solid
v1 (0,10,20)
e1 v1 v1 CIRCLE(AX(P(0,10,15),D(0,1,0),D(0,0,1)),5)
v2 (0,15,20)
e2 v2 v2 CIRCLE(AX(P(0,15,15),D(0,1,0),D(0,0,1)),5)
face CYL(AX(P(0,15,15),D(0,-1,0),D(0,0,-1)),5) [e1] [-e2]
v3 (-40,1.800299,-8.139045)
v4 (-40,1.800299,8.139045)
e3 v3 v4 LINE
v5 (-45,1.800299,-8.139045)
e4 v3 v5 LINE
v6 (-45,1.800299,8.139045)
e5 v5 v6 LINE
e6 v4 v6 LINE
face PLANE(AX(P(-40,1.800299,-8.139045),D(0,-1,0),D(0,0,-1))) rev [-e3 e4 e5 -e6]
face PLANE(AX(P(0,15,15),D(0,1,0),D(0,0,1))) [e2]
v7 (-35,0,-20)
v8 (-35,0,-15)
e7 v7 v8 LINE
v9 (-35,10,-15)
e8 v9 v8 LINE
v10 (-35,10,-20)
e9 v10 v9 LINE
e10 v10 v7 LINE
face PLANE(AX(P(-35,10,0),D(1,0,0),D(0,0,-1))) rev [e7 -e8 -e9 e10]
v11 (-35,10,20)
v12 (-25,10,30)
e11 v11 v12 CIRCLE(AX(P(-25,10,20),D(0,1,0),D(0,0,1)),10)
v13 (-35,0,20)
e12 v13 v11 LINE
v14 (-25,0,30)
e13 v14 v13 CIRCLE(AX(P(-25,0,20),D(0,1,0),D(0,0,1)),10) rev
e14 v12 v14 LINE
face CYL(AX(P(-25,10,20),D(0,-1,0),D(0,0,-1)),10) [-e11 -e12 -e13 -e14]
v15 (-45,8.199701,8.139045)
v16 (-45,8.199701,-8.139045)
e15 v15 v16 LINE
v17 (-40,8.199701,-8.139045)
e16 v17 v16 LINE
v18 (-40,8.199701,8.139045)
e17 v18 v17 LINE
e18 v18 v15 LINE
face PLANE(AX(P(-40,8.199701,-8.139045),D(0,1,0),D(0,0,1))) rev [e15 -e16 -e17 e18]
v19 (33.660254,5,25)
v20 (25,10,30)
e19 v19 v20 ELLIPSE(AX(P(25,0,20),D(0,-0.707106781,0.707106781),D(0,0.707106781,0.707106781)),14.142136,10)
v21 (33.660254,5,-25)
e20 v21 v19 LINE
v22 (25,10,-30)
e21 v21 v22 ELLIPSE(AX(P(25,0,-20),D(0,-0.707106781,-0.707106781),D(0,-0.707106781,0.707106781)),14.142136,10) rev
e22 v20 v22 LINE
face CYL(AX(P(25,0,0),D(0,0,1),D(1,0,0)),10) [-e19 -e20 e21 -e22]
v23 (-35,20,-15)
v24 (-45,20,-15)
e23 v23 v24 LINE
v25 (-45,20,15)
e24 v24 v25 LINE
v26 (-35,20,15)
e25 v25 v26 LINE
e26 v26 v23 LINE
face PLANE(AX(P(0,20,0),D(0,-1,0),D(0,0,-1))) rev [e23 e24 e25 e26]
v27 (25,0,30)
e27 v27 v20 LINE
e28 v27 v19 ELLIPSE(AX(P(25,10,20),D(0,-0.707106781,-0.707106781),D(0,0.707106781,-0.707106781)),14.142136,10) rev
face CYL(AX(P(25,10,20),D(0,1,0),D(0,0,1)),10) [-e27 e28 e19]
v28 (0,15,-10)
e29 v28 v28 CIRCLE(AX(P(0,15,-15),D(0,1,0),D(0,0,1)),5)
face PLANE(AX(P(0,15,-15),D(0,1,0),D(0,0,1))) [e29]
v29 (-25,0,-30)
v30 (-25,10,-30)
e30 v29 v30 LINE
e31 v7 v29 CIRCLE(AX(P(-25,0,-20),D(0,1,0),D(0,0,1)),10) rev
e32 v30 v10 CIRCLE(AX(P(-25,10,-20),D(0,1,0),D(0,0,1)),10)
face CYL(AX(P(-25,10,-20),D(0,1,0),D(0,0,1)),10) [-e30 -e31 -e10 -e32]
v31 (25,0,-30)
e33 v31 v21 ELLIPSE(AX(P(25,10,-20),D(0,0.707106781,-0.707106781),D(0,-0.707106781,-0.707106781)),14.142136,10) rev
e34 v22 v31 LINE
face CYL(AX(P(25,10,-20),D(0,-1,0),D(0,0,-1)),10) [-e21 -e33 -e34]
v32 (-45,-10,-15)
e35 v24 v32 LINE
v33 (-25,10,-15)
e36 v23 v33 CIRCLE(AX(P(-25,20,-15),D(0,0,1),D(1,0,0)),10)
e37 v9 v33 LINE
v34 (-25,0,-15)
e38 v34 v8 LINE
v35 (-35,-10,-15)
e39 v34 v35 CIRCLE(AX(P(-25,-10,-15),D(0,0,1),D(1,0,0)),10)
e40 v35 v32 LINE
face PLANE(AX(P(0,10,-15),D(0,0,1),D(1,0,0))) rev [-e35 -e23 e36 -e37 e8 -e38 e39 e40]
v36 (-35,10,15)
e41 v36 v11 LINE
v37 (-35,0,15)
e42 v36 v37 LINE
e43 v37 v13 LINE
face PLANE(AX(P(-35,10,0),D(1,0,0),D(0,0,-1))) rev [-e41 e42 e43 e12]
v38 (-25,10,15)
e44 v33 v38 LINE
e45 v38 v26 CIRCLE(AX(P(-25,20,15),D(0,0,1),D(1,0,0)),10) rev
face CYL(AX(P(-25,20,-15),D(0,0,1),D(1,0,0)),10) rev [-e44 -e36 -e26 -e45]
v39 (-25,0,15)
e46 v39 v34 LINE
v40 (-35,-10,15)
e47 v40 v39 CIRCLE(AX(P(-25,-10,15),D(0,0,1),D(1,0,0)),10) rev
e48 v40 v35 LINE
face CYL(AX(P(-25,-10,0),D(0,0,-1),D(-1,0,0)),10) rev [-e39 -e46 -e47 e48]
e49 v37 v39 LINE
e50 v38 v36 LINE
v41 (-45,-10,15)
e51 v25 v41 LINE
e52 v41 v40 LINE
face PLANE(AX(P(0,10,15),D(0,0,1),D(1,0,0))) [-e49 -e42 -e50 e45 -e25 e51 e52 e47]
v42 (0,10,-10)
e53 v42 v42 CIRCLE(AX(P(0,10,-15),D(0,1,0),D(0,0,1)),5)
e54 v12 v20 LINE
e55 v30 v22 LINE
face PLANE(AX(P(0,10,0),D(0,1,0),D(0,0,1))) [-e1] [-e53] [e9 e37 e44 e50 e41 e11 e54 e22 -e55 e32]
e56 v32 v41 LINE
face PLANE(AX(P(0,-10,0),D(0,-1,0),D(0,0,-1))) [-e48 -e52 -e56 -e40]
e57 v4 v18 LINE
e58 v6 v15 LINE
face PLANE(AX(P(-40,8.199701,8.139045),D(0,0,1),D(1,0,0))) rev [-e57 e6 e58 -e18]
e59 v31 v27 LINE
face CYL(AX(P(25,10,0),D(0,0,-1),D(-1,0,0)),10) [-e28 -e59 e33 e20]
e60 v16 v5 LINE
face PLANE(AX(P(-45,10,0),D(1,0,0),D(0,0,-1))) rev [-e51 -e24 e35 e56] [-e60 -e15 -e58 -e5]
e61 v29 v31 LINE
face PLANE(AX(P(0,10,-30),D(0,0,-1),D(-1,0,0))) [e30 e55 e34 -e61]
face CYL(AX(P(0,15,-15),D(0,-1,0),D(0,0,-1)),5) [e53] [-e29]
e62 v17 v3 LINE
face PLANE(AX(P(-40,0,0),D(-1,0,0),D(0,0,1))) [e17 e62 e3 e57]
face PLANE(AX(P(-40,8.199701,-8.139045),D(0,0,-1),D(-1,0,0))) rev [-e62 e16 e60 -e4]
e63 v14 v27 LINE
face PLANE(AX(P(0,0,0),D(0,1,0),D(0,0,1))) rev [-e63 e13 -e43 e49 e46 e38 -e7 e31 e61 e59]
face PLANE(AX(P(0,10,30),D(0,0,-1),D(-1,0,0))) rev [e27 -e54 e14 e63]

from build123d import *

# Parameters (mm, degrees)
SKETCH1_W                = 10
SKETCH1_H                = 30
SKETCH1_W_2              = 70
SKETCH1_H_2              = 60
BOSS_EXTRUDE1_DEPTH      = 10
BOSS_EXTRUDE2_DEPTH      = 10
BOSS_EXTRUDE2_DEPTH_BACK = 20
SKETCH2_W                = 10
SKETCH2_H                = 30
FILLET1_R                = 10
SKETCH3_R                = 5
BOSS_EXTRUDE3_DEPTH      = 5
SKETCH4_W                = 16.278089822
SKETCH4_H                = 6.399401724
CUT_EXTRUDE1_DEPTH       = 5


with BuildPart() as part:
    # Sketch1 → Boss-Extrude1 (new body)
    with BuildSketch(Plane(origin=(0, 0, 0), x_dir=(1, 0, 0), z_dir=(0, 1, 0))):
        with Locations((-40, 0)):
            Rectangle(SKETCH1_W, SKETCH1_H)
        Rectangle(SKETCH1_W_2, SKETCH1_H_2)
    extrude(amount=BOSS_EXTRUDE1_DEPTH)

    # Sketch2 → Boss-Extrude2 (add, two sides: drawn at the far end of the back side and taken through both)
    with BuildSketch(Plane(origin=(0, 10, 0), x_dir=(1, 0, 0), z_dir=(0, 1, 0)).offset(-BOSS_EXTRUDE2_DEPTH_BACK)):
        with Locations((-40, 0)):
            Rectangle(SKETCH2_W, SKETCH2_H)
    extrude(amount=BOSS_EXTRUDE2_DEPTH + BOSS_EXTRUDE2_DEPTH_BACK)

    # Fillet1
    # the kernel refuses this fillet: 10 mm, written as the material it adds along each edge
    with BuildSketch(Plane(origin=(-35, 0, 15), x_dir=(0, -1, 0), z_dir=(0, 0, -1)), Plane(origin=(-35, 10, 15), x_dir=(1, 0, 0), z_dir=(0, 0, -1))) as fillet1_piece_1:
        with BuildLine():
            CenterArc((FILLET1_R, -FILLET1_R), FILLET1_R, 90, 90)
            Line((0, -FILLET1_R), (0, 0))
            Line((0, 0), (FILLET1_R, 0))
        make_face()
    extrude(amount=30)
    # the kernel refuses this fillet: 10 mm, written as the material it takes off along each edge
    with BuildSketch(Plane(origin=(35, 0, -55), x_dir=(0, 1, 0), z_dir=(0, 0, 1))) as fillet1_2_piece_1:
        with BuildLine():
            CenterArc((FILLET1_R, FILLET1_R), FILLET1_R, 180, 90)
            Line((0, FILLET1_R), (0, 0))
            Line((0, 0), (FILLET1_R, 0))
        make_face()
    extrude(amount=110, mode=Mode.SUBTRACT)
    with BuildSketch(Plane(origin=(-35, -25, -30), x_dir=(1, 0, 0), z_dir=(0, 1, 0)), Plane(origin=(35, -25, -30), x_dir=(0, 0, 1), z_dir=(0, 1, 0))) as fillet1_2_piece_2:
        with BuildLine():
            CenterArc((FILLET1_R, -FILLET1_R), FILLET1_R, 90, 90)
            Line((0, -FILLET1_R), (0, 0))
            Line((0, 0), (FILLET1_R, 0))
        make_face()
    extrude(amount=60, mode=Mode.SUBTRACT)
    with BuildSketch(Plane(origin=(35, -25, 30), x_dir=(0, 0, -1), z_dir=(0, 1, 0)), Plane(origin=(-35, -25, 30), x_dir=(1, 0, 0), z_dir=(0, 1, 0))) as fillet1_2_piece_3:
        with BuildLine():
            CenterArc((FILLET1_R, FILLET1_R), FILLET1_R, 180, 90)
            Line((0, FILLET1_R), (0, 0))
            Line((0, 0), (FILLET1_R, 0))
        make_face()
    extrude(amount=60, mode=Mode.SUBTRACT)
    with BuildSketch(Plane(origin=(35, 10, -55), x_dir=(0, -1, 0), z_dir=(0, 0, 1))) as fillet1_2_piece_4:
        with BuildLine():
            CenterArc((FILLET1_R, -FILLET1_R), FILLET1_R, 90, 90)
            Line((0, -FILLET1_R), (0, 0))
            Line((0, 0), (FILLET1_R, 0))
        make_face()
    extrude(amount=110, mode=Mode.SUBTRACT)

    # Sketch3 → Boss-Extrude3 (add)
    with BuildSketch(Plane(origin=(0, 10, 0), x_dir=(1, 0, 0), z_dir=(0, 1, 0))):
        with Locations(Location((0, 15, 0), (0, 0, 270))):
            Circle(SKETCH3_R)
        with Locations(Location((0, -15, 0), (0, 0, 270))):
            Circle(SKETCH3_R)
    extrude(amount=BOSS_EXTRUDE3_DEPTH)

    # Sketch4 → Cut-Extrude1 (cut)
    with BuildSketch(Plane.ZY.offset(45)):
        with Locations((0, 5)):
            Rectangle(SKETCH4_W, SKETCH4_H)
    extrude(amount=-CUT_EXTRUDE1_DEPTH, mode=Mode.SUBTRACT)


solid = part.part
